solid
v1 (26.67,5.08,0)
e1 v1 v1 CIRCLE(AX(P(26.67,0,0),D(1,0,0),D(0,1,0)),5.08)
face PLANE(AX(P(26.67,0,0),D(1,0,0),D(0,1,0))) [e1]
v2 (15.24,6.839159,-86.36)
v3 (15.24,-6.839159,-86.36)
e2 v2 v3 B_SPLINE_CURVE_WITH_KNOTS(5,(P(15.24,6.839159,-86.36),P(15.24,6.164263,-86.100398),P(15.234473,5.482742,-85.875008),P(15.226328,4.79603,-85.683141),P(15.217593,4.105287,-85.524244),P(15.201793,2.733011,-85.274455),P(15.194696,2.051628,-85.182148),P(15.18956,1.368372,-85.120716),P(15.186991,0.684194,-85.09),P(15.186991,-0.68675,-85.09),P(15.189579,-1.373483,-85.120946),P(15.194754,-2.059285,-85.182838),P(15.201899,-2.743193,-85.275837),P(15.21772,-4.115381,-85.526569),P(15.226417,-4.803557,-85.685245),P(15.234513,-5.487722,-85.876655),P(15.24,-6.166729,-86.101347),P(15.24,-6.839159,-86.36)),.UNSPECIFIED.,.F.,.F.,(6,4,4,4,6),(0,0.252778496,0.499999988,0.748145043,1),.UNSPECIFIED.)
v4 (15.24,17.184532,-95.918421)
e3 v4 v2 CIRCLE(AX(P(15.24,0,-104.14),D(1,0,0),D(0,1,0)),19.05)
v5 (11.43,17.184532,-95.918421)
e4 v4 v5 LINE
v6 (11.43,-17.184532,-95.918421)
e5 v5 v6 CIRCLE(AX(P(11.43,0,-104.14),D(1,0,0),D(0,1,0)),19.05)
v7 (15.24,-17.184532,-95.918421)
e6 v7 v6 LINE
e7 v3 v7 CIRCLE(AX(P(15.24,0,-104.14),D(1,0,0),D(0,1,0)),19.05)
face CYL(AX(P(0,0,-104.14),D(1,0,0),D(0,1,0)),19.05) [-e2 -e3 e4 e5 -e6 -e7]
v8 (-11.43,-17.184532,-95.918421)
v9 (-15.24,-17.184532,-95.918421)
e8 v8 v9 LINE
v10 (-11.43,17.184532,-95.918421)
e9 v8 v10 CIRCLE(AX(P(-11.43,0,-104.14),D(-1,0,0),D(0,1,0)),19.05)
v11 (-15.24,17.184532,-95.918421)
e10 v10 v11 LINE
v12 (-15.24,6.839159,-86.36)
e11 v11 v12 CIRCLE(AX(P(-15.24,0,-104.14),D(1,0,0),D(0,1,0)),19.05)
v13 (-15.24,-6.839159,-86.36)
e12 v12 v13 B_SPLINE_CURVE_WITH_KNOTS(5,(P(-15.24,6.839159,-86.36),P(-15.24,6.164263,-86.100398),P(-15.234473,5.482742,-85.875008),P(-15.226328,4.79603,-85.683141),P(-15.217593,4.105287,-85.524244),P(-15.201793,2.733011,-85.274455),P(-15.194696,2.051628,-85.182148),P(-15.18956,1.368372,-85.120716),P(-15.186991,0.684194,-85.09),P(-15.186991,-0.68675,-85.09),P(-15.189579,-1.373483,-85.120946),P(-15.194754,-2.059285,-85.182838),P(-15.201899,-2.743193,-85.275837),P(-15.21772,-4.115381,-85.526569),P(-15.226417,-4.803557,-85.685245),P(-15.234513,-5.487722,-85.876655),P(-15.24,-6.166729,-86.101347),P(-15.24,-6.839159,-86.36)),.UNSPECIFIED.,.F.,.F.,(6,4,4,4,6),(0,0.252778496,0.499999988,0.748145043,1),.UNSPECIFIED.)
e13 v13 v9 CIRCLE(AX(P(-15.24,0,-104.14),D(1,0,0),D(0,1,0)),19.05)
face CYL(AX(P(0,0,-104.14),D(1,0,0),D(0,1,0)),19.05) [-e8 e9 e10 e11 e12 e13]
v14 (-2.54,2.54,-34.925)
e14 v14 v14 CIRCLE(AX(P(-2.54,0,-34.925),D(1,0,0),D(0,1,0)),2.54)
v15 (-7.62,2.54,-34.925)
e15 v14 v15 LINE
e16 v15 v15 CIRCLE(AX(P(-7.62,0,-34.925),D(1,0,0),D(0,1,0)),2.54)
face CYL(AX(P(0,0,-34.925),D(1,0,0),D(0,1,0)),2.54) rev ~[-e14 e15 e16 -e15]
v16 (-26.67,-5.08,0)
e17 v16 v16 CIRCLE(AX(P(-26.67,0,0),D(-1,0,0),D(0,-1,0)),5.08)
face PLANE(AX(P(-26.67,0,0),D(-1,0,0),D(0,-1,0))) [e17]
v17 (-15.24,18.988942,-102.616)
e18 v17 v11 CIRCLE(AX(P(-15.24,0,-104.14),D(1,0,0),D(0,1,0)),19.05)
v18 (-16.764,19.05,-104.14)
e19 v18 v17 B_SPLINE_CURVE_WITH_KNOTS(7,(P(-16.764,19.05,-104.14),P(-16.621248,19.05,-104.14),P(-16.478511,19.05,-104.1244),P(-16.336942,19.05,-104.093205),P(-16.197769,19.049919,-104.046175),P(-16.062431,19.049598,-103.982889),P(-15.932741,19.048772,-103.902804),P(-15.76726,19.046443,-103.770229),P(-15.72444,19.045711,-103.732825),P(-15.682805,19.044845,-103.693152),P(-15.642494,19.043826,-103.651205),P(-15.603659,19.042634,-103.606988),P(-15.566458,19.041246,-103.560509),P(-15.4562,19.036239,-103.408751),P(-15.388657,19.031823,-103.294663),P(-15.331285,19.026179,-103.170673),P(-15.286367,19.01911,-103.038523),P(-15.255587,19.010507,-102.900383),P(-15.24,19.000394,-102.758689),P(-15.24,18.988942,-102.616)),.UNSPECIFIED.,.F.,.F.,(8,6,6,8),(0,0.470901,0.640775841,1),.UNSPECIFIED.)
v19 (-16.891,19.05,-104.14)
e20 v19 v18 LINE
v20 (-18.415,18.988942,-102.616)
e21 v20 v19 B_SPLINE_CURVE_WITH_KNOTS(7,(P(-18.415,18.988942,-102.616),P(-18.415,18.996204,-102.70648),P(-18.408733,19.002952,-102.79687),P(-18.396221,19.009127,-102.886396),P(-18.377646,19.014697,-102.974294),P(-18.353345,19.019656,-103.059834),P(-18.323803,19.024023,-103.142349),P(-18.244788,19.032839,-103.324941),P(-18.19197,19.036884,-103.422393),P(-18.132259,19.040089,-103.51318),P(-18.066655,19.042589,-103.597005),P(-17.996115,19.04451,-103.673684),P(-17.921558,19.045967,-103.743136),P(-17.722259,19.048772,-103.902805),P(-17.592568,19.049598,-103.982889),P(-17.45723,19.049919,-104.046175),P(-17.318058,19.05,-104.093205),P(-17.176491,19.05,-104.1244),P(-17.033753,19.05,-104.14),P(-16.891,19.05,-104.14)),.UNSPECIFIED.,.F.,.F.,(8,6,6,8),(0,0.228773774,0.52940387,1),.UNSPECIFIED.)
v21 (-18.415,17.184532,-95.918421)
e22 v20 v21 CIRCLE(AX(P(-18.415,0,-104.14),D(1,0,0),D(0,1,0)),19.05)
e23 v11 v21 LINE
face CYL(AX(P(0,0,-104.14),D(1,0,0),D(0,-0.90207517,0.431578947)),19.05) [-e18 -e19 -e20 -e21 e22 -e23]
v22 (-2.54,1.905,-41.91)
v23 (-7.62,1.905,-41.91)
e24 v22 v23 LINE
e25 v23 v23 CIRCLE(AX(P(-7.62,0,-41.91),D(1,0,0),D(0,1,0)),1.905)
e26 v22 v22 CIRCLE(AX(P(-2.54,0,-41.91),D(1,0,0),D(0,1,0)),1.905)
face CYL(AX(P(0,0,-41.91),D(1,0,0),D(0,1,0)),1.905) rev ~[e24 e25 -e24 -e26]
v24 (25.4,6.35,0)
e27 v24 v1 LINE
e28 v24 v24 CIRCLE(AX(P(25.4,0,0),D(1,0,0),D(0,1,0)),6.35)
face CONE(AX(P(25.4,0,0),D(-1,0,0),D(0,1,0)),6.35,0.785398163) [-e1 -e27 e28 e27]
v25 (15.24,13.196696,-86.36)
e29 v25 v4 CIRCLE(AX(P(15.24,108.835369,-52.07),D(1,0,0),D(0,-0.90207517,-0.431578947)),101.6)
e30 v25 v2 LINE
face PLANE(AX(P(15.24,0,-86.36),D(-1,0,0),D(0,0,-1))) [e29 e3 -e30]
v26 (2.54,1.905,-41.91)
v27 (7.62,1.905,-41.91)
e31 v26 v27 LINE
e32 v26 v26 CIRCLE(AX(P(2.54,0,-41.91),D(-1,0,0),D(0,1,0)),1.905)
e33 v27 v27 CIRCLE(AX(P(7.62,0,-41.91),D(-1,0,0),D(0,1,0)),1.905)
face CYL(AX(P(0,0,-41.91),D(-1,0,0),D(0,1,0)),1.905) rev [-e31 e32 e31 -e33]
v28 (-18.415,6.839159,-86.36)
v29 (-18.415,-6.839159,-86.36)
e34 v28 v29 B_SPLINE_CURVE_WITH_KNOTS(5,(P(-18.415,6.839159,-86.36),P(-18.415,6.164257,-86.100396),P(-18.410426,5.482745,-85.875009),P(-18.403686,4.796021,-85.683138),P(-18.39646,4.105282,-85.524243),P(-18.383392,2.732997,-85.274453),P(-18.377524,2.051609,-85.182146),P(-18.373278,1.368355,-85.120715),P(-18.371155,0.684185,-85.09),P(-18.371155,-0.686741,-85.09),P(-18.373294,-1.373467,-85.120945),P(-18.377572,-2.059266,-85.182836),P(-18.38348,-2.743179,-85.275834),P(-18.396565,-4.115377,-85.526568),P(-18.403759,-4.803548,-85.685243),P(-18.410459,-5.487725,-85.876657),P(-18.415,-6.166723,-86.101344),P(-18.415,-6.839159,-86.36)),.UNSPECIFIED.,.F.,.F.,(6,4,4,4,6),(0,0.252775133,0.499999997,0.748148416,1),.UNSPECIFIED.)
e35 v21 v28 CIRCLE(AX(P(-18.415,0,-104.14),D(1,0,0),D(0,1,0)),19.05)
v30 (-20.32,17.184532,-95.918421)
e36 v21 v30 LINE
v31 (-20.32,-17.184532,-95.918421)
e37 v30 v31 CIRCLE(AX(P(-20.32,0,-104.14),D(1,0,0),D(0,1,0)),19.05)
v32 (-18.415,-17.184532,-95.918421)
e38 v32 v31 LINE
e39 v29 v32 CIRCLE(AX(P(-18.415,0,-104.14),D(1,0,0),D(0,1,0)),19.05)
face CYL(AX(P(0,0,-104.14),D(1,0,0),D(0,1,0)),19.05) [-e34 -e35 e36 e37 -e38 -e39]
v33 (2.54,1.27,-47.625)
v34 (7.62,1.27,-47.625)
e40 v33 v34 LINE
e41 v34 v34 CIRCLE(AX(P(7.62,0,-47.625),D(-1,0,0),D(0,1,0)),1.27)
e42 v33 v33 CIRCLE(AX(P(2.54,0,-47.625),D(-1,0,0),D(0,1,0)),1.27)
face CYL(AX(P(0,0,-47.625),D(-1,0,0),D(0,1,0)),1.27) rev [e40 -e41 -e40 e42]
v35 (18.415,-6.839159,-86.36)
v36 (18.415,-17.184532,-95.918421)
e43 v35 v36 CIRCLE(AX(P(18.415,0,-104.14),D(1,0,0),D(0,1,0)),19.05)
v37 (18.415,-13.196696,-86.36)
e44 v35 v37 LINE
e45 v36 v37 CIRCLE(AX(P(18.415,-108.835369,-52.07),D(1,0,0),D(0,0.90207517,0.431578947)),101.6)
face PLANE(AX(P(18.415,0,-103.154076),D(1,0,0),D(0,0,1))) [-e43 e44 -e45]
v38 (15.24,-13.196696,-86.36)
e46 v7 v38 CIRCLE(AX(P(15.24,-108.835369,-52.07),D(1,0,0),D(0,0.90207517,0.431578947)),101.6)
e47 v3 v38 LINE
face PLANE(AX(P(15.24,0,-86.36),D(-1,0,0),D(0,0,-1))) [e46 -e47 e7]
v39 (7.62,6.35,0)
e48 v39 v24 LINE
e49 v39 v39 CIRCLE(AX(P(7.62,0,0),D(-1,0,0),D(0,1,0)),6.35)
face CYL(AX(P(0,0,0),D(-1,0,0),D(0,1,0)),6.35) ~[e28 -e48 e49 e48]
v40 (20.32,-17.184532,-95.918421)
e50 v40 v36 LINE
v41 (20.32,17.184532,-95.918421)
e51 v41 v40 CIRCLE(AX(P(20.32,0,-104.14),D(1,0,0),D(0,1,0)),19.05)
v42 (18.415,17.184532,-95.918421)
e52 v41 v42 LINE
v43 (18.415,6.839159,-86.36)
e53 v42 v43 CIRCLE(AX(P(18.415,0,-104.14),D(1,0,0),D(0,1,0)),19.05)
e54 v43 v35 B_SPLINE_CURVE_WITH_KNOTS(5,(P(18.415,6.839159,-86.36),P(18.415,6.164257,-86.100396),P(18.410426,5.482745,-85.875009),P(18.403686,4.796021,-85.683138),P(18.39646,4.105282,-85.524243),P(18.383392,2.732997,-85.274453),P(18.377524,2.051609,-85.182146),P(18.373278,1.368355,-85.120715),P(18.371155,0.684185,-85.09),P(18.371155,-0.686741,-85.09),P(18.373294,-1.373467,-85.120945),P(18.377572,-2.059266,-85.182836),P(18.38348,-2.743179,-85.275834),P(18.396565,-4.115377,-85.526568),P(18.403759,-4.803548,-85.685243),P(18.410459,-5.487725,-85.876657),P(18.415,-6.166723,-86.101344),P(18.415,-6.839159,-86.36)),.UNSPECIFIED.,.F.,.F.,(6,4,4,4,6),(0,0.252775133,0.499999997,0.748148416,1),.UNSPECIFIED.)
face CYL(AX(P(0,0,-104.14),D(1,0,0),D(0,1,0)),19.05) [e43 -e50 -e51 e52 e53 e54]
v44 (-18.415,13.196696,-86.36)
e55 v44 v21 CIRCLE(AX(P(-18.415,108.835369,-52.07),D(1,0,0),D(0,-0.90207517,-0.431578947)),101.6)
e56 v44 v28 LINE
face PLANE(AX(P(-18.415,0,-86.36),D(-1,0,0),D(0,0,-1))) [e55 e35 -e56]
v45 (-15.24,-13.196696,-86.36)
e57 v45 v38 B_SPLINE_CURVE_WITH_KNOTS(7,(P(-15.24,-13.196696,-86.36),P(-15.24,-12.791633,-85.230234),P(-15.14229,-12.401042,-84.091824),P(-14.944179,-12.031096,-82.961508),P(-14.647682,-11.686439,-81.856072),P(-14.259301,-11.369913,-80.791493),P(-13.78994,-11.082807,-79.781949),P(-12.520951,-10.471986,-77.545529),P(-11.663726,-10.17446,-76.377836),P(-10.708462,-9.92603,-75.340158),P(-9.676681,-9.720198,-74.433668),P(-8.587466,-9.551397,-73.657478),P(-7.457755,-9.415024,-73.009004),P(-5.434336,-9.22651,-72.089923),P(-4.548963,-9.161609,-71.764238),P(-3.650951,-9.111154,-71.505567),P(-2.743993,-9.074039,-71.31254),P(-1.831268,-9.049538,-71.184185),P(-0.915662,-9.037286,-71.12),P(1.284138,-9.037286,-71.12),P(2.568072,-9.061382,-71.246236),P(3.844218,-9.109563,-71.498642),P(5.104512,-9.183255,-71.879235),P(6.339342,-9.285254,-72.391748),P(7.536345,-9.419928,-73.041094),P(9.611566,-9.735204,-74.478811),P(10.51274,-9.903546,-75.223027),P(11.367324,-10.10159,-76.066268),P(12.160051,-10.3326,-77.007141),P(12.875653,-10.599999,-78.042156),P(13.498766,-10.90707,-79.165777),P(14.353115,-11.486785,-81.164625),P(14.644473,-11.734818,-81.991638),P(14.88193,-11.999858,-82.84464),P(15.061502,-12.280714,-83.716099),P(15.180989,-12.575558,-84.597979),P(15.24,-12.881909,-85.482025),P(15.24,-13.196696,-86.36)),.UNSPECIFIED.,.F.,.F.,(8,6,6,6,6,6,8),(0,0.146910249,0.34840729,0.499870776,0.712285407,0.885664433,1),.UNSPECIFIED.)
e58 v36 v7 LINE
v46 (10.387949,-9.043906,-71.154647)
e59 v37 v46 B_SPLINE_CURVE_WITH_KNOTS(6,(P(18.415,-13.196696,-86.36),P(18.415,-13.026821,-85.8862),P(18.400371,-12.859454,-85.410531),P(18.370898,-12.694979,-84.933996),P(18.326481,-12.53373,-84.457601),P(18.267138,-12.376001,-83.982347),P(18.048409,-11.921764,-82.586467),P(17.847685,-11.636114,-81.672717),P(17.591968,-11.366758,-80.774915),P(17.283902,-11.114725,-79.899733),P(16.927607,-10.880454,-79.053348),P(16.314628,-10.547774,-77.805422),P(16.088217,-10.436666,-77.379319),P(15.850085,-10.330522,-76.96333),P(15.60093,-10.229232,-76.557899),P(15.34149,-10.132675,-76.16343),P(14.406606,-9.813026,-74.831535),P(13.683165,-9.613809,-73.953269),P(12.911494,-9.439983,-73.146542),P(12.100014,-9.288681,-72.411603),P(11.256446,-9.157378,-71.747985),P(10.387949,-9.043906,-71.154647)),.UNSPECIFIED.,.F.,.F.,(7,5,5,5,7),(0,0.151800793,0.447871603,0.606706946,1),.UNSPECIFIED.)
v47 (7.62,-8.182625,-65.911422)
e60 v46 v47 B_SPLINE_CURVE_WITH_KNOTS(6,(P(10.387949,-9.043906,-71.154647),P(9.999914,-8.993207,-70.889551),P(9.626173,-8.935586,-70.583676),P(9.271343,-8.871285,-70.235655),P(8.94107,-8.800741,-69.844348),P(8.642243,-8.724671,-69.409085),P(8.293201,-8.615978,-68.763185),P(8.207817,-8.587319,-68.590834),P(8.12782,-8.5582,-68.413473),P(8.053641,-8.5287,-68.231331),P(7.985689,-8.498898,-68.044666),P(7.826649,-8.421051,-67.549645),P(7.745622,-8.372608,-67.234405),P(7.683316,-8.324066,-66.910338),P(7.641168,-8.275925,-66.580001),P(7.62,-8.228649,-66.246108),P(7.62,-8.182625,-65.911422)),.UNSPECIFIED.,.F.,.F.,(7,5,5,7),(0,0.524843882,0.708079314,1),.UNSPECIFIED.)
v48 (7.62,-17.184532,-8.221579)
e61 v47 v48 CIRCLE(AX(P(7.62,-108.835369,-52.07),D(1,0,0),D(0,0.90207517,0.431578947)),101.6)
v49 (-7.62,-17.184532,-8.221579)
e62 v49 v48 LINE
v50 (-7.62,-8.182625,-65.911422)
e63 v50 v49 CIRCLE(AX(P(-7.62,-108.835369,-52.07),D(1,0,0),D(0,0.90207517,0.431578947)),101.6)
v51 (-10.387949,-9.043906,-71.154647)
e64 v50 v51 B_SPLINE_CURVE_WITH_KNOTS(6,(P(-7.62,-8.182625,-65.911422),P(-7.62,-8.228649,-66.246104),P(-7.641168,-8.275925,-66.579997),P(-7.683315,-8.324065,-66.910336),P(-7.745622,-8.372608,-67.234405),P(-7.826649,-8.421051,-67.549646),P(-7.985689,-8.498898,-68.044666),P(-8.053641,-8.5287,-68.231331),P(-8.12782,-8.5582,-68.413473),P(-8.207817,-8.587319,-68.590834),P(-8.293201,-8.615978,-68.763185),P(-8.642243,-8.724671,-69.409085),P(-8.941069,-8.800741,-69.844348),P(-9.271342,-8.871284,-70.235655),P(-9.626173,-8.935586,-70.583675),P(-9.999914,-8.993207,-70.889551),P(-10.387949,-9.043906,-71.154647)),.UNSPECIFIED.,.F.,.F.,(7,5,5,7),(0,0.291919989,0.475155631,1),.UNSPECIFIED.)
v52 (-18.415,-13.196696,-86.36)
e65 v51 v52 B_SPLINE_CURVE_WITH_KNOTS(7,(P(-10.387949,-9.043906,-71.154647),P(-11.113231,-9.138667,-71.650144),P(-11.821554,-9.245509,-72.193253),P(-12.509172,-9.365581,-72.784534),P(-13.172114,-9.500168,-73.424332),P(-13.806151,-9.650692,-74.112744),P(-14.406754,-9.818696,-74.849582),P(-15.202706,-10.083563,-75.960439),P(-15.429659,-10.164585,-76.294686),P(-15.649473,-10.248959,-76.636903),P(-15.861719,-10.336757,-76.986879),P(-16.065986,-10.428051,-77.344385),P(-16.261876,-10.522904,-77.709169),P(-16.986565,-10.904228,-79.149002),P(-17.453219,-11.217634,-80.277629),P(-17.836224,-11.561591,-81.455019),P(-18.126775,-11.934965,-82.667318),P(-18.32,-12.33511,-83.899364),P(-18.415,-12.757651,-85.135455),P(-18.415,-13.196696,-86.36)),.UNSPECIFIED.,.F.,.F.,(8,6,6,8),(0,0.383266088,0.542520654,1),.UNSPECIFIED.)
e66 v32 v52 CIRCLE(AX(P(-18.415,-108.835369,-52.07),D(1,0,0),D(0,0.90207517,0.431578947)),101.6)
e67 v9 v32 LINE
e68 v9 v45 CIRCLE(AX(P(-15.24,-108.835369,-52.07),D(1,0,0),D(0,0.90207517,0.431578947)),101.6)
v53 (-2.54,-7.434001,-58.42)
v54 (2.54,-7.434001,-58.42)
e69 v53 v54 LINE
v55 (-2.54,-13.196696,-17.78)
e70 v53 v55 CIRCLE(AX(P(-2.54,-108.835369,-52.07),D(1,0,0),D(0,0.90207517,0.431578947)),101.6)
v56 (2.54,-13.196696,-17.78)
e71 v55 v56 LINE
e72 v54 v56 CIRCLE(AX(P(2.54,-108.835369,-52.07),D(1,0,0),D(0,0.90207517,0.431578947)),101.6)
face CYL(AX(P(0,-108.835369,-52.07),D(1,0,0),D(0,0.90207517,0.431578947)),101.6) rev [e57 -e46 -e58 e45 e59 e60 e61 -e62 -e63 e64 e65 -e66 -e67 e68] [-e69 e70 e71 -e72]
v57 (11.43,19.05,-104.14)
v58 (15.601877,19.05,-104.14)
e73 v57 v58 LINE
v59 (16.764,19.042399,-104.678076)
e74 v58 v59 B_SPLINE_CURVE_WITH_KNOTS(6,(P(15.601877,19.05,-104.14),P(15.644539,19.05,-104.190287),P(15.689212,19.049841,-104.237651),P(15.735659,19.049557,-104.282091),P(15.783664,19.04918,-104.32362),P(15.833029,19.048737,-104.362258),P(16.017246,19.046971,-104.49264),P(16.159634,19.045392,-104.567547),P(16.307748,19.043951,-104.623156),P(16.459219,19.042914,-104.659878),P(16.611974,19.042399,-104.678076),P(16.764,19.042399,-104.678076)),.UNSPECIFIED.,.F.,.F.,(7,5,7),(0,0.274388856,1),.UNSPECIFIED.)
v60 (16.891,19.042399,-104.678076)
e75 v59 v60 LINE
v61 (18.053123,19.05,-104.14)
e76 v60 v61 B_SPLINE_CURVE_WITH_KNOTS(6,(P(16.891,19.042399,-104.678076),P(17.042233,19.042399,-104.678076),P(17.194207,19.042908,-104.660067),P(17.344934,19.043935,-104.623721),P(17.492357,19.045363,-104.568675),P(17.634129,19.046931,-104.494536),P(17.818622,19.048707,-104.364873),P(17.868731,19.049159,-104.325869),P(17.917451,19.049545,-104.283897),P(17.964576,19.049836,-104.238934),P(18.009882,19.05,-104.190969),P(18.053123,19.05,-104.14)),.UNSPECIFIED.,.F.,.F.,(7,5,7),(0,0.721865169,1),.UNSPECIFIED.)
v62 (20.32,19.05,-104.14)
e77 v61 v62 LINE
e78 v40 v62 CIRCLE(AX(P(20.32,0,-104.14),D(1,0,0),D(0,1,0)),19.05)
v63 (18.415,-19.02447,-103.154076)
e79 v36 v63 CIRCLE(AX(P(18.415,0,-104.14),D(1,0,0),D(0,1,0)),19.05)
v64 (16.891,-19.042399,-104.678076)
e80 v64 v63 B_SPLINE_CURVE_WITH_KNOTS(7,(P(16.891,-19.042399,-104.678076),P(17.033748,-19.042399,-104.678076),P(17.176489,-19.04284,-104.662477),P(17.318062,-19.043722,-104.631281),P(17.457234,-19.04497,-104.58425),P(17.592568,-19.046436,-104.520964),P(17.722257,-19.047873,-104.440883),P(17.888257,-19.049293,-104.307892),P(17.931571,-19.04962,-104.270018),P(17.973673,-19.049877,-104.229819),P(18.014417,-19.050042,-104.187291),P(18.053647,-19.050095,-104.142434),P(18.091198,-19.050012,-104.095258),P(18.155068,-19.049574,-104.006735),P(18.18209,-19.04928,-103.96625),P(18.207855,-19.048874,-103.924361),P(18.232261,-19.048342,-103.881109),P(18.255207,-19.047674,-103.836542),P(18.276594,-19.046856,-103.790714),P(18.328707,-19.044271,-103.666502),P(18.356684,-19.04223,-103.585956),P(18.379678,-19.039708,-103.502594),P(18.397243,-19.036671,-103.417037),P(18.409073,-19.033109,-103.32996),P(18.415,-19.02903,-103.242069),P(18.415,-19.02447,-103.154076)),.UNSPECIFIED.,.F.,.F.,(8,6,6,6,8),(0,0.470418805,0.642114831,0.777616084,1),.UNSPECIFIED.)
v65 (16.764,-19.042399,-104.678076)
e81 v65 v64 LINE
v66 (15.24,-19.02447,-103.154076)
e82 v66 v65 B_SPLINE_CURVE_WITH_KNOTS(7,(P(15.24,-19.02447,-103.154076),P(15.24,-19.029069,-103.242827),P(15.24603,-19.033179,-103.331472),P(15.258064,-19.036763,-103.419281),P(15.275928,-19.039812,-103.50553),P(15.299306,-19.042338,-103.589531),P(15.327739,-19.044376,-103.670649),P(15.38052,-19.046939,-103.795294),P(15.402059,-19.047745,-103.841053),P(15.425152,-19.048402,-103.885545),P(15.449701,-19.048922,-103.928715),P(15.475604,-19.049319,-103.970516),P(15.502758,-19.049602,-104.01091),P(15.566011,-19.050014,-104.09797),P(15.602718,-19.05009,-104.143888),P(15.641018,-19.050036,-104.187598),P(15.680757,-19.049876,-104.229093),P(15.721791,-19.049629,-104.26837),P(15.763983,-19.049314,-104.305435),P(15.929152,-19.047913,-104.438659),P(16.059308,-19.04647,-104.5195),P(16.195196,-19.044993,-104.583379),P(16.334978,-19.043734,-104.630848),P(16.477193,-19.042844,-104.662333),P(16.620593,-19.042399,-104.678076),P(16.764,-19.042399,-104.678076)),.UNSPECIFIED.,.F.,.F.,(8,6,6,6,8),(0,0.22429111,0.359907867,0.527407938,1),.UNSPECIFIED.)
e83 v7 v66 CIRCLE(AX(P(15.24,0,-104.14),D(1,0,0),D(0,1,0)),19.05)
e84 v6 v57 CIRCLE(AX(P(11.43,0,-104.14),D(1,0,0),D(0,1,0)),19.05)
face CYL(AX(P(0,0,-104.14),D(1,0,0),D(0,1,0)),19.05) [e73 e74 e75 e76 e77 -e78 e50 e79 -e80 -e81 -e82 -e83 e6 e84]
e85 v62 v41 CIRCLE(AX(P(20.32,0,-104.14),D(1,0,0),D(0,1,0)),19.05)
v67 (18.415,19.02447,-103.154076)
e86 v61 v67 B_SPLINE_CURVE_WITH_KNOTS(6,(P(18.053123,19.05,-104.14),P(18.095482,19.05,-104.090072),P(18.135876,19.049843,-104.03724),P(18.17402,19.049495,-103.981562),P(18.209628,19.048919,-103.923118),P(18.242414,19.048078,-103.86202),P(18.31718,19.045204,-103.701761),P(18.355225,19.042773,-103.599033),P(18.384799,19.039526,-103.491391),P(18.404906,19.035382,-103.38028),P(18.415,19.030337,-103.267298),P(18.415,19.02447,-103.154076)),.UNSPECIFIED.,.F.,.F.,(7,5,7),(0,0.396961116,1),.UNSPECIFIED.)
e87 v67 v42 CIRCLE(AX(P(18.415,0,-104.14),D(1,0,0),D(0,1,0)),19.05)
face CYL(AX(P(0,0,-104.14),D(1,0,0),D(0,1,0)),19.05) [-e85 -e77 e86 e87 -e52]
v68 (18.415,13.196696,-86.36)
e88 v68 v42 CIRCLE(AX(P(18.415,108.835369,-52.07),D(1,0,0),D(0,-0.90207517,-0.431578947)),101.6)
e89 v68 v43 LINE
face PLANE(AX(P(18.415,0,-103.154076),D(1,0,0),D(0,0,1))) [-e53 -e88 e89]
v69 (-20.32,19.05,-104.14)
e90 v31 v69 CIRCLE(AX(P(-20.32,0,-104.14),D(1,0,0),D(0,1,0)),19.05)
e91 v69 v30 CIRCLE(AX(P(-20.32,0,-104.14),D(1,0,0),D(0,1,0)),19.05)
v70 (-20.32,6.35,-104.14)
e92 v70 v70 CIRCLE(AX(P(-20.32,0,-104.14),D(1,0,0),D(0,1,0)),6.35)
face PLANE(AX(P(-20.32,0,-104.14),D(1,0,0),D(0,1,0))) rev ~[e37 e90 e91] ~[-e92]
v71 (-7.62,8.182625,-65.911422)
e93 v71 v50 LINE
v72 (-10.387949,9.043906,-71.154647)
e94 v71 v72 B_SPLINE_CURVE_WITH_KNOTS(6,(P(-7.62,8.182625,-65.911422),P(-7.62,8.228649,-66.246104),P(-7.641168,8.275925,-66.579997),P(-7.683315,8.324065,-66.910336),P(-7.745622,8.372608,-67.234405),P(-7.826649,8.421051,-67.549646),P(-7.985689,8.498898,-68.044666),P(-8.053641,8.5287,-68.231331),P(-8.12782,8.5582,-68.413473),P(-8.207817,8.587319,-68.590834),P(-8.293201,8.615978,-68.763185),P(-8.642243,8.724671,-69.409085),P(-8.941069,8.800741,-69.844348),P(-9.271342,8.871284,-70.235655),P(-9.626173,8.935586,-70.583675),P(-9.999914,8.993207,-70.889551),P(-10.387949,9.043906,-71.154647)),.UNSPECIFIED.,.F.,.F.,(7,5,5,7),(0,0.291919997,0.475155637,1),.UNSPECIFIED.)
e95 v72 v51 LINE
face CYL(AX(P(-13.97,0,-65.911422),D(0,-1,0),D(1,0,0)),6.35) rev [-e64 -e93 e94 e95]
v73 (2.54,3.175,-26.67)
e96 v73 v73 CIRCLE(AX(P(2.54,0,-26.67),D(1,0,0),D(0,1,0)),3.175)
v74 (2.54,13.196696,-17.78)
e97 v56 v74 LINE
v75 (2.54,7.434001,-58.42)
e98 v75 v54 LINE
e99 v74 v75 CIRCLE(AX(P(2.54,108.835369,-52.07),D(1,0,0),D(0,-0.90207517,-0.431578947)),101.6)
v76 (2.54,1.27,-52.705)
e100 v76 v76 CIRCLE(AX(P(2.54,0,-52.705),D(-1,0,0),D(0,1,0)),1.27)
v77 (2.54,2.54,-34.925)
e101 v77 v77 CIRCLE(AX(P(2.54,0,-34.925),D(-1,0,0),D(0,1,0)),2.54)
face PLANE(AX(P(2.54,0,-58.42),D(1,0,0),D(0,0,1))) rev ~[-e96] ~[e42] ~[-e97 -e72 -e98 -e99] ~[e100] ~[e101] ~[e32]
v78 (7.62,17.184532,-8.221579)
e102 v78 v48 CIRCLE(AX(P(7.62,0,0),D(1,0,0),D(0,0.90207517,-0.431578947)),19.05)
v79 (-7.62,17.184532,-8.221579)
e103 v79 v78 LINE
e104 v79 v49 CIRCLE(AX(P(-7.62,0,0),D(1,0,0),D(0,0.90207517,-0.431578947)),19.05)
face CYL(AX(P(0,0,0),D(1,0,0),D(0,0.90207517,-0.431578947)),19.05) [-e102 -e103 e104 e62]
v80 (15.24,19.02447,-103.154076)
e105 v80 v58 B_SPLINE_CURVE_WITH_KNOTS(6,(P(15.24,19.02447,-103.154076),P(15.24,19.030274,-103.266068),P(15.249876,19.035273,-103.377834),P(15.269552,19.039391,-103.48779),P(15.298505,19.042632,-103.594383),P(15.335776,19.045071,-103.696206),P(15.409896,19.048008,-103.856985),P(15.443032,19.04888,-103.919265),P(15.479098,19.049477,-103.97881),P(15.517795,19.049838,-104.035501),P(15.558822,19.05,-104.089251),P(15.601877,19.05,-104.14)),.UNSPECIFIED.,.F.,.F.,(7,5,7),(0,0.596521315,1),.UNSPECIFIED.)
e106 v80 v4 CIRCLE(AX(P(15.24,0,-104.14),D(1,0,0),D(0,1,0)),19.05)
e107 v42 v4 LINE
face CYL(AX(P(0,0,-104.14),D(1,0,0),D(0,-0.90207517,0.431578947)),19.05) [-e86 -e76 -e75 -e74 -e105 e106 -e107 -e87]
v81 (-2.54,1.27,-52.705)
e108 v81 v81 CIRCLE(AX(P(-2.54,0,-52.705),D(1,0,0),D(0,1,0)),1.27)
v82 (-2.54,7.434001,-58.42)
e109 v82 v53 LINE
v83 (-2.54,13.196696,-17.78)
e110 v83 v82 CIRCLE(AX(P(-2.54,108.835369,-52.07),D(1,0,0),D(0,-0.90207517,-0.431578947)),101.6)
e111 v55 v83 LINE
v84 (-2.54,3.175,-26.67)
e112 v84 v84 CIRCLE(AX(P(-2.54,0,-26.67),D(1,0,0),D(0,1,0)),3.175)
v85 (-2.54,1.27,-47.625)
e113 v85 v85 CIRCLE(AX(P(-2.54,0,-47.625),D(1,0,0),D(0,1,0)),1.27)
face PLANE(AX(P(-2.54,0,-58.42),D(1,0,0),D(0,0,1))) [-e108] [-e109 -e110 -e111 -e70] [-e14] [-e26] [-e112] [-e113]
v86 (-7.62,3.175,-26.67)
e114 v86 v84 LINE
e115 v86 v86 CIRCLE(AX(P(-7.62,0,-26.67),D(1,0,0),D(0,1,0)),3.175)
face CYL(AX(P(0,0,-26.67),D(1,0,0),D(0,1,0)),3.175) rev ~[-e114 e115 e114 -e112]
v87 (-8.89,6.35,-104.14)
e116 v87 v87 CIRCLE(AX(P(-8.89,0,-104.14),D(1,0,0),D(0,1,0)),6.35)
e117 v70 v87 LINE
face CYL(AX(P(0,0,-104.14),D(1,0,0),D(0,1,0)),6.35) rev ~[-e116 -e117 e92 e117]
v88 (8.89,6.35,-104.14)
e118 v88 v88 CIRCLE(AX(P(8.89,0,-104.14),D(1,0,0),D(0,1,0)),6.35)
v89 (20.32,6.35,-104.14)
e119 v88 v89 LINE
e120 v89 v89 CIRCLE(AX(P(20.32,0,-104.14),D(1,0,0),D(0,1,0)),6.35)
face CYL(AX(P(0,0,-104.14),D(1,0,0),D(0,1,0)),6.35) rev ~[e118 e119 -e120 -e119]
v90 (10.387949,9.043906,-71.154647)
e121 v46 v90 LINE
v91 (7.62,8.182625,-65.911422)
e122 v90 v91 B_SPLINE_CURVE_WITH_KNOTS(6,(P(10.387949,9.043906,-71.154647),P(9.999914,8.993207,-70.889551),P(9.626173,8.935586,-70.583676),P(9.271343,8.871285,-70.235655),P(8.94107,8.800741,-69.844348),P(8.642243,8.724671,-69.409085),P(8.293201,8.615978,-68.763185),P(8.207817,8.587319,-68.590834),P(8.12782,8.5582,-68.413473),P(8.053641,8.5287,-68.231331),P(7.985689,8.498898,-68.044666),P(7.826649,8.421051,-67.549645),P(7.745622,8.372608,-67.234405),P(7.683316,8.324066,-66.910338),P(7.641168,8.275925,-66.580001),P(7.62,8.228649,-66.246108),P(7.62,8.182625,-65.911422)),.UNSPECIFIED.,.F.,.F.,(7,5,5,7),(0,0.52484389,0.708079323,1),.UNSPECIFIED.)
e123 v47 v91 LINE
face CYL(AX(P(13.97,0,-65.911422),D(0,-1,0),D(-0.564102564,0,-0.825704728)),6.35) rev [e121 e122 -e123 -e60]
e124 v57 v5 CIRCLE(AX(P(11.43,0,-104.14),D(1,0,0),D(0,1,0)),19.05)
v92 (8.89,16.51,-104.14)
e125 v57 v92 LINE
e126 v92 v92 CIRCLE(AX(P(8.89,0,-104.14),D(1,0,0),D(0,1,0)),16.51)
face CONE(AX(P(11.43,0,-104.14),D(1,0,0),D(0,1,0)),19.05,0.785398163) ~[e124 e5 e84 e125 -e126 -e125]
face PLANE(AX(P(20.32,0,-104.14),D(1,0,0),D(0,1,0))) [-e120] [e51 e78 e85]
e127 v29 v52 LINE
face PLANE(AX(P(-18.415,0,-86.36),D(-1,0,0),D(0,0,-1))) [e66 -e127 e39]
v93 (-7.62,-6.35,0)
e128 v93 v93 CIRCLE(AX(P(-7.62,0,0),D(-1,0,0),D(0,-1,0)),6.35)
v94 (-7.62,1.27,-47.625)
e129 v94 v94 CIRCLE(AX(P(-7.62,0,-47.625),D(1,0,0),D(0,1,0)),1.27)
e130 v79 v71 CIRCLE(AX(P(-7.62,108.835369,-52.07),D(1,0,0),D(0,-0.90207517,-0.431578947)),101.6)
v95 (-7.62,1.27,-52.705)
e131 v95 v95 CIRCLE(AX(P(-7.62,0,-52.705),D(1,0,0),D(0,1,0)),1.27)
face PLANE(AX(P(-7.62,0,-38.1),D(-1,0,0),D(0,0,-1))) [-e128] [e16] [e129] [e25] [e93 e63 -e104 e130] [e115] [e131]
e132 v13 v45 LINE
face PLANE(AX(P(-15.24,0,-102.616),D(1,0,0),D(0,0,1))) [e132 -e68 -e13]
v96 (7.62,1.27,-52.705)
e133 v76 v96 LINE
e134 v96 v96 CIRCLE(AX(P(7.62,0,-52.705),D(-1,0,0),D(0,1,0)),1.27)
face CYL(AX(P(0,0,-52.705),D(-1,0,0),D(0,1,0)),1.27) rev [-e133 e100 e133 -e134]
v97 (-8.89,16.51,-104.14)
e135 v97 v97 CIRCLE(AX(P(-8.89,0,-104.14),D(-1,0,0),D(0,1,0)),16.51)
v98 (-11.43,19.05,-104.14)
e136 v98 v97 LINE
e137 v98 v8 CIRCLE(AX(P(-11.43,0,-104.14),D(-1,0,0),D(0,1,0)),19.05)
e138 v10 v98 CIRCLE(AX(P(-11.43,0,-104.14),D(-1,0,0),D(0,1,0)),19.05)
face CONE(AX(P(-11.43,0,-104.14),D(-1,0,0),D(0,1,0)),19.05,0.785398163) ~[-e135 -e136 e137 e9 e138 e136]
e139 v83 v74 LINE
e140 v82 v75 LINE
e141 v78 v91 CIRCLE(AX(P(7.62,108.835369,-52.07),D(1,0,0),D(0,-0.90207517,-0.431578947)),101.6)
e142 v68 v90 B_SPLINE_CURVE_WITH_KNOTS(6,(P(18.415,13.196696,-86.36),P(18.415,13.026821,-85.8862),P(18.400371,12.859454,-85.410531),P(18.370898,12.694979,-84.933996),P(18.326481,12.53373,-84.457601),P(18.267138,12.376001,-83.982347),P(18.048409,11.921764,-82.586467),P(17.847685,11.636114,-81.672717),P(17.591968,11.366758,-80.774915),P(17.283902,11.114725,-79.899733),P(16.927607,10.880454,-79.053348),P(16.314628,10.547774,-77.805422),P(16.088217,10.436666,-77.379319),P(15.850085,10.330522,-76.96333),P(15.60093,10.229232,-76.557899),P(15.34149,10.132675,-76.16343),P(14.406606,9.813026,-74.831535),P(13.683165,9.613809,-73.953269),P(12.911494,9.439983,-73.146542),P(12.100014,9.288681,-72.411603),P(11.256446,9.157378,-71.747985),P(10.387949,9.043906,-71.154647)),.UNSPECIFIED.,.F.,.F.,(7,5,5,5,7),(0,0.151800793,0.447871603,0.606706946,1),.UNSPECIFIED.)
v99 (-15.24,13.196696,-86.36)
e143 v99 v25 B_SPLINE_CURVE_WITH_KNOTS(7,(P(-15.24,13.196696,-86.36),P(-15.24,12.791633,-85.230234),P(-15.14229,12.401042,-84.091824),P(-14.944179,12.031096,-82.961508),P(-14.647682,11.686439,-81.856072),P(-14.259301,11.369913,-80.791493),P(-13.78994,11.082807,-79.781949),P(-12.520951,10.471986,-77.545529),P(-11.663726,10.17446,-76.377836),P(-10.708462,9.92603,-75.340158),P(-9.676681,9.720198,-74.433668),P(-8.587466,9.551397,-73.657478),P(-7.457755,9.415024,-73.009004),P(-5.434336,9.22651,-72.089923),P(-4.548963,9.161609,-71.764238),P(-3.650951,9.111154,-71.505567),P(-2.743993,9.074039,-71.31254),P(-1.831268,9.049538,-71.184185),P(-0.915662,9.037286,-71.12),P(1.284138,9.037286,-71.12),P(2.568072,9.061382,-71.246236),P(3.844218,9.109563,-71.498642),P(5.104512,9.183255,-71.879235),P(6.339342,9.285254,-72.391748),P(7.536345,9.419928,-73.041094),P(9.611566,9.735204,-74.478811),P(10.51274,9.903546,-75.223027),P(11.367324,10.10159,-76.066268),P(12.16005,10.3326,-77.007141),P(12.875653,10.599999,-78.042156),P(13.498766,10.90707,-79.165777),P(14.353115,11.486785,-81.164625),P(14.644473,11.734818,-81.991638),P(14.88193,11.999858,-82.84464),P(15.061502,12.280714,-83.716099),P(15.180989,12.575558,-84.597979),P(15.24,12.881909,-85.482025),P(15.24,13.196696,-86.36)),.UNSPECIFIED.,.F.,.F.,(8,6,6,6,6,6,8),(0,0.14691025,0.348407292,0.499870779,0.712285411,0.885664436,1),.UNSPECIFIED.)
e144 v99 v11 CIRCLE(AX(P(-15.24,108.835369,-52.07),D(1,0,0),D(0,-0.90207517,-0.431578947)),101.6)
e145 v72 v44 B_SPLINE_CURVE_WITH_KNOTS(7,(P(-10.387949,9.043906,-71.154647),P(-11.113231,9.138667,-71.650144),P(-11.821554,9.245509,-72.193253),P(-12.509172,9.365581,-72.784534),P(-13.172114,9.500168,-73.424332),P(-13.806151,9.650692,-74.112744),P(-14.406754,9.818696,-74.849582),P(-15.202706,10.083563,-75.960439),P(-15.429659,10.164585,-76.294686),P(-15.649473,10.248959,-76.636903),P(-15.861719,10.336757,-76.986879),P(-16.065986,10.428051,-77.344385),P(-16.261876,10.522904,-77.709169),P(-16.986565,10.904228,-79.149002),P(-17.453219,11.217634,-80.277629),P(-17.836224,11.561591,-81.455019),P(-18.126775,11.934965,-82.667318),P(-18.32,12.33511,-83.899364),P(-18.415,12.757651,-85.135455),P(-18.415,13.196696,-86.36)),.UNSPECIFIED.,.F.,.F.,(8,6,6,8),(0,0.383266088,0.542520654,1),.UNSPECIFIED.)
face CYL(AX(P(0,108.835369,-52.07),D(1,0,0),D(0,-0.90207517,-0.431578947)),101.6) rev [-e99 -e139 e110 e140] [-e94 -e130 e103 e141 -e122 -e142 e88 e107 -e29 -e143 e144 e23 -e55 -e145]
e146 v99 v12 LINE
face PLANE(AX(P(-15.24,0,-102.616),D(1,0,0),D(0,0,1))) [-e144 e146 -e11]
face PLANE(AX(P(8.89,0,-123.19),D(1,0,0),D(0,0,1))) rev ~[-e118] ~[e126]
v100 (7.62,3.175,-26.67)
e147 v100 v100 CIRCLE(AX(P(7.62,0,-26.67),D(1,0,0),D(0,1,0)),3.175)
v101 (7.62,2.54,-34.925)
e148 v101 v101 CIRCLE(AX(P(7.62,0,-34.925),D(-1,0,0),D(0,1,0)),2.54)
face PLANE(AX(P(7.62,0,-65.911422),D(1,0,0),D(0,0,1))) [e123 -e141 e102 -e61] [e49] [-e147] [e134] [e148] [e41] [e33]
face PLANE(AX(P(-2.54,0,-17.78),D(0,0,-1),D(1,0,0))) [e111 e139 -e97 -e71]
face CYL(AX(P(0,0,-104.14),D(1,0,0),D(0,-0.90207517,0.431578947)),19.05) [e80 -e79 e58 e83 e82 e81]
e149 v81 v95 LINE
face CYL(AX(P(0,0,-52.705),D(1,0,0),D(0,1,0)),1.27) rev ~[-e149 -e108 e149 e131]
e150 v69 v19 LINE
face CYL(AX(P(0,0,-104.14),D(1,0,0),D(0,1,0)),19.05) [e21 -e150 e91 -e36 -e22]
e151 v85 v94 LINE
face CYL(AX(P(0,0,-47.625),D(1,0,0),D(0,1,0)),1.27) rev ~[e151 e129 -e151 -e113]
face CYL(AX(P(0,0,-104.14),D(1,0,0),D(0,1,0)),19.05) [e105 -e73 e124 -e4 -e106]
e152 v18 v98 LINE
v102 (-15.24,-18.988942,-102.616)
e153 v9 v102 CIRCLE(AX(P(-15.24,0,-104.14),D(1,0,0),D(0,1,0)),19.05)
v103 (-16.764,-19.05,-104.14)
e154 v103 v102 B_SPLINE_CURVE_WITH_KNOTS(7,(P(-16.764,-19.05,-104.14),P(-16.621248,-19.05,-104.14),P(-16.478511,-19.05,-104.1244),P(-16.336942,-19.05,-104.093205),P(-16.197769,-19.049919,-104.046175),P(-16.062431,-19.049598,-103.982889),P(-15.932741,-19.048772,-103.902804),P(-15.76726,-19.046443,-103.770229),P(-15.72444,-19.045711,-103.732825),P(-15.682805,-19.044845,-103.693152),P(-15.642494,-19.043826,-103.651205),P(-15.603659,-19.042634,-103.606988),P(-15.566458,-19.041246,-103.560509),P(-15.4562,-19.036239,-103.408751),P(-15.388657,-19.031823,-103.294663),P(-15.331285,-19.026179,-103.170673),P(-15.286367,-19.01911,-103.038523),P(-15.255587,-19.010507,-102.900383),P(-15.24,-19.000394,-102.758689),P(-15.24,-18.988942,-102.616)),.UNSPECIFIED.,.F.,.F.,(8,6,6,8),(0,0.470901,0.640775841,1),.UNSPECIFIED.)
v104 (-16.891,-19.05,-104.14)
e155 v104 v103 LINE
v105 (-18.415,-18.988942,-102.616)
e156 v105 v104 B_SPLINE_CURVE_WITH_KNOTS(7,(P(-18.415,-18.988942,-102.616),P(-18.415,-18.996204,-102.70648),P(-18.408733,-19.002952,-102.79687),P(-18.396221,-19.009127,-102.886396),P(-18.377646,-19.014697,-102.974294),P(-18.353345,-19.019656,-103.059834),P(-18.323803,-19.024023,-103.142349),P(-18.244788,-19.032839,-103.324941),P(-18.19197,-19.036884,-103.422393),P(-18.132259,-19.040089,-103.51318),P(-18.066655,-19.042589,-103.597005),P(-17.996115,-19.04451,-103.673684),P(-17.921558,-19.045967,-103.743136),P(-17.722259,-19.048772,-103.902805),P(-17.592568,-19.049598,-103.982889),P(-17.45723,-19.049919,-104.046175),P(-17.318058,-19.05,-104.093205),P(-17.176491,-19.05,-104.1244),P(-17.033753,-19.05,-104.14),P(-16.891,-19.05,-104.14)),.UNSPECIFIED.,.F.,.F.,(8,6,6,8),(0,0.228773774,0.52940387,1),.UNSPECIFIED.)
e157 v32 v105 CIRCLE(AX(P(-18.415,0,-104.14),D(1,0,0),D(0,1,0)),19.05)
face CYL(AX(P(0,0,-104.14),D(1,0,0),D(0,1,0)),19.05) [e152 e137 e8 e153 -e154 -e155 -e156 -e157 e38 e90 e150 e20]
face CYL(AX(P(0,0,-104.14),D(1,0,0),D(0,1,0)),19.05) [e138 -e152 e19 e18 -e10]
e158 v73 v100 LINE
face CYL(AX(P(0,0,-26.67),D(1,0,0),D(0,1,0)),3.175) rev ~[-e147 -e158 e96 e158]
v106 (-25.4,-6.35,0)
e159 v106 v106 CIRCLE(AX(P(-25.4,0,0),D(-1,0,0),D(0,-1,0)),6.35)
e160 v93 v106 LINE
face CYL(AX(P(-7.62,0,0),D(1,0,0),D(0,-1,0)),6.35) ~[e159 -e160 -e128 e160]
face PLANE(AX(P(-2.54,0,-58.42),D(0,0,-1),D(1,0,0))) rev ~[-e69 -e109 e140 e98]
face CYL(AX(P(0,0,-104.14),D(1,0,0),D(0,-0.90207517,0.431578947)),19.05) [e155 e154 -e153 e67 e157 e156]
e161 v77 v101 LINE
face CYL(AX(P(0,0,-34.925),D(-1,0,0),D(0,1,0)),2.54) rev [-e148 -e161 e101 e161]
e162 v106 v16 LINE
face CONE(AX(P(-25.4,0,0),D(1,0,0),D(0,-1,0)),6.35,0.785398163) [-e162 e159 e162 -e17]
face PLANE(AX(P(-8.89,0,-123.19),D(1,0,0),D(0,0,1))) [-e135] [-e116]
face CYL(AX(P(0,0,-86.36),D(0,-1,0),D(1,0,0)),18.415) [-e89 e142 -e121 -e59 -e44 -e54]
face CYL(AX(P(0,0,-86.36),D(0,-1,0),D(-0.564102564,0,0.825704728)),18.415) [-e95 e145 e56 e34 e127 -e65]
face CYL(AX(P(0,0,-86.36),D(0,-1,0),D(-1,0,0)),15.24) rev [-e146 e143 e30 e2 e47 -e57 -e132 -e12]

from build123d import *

# Parameters (mm, degrees)
F1_DEPTH  = 22.225
F3_R      = 19.05
F4_DEPTH  = 20.32
F2_R      = 6.35
F6_DEPTH  = 38.1
F5_W      = 17.78
F5_H      = 38.1
F7_DEPTH  = 19.05
F8_SIZE   = 2.54
F10_DEPTH = 7.62
F11_R     = 6.35
F12_DEPTH = 26.67
F13_SIZE  = 1.27
F15_DEPTH = 38.1
F16_W     = 5.08
F16_H     = 40.64
F17_DEPTH = 25.4
F18_R     = 6.35
F19_DEPTH = 19.05
F20_R     = 1.905
F20_R_2   = 1.27
F20_R_3   = 2.54
F20_R_4   = 3.175
F21_DEPTH = 12.7
F22_SIZE  = 1.27


with BuildPart() as f1:
    # F0 (on Front) → F1 (new body, symmetric)
    with BuildSketch(Plane.XZ):
        with BuildLine():
            Line((7.62, 0), (-7.62, 0))
            Line((-7.62, 0), (-7.62, -24.5142909701))
            Line((-7.62, -24.5142909701), (-7.62, -27.8114224211))
            ThreePointArc((-7.62, -27.8114224211), (-8.3544623748, -30.77591853), (-10.3879487179, -33.0546474413))
            ThreePointArc((-10.3879487179, -33.0546474413), (-16.2850591132, -39.6629612843), (-18.415, -48.26))
            Line((-18.415, -48.26), (-18.415, -64.516))
            ThreePointArc((-18.415, -64.516), (-17.9686307345, -65.5936307345), (-16.891, -66.04))
            Line((-16.891, -66.04), (-16.764, -66.04))
            ThreePointArc((-16.764, -66.04), (-15.6863692655, -65.5936307345), (-15.24, -64.516))
            Line((-15.24, -64.516), (-15.24, -48.26))
            ThreePointArc((-15.24, -48.26), (0, -33.02), (15.24, -48.26))
            Line((15.24, -48.26), (15.24, -65.0540764831))
            ThreePointArc((15.24, -65.0540764831), (15.6863692655, -66.1317072176), (16.764, -66.5780764831))
            Line((16.764, -66.5780764831), (16.891, -66.5780764831))
            ThreePointArc((16.891, -66.5780764831), (17.9686307345, -66.1317072176), (18.415, -65.0540764831))
            Line((18.415, -65.0540764831), (18.415, -48.26))
            ThreePointArc((18.415, -48.26), (16.2850591132, -39.6629612843), (10.3879487179, -33.0546474413))
            ThreePointArc((10.3879487179, -33.0546474413), (8.3544623748, -30.77591853), (7.62, -27.8114224211))
            Line((7.62, -27.8114224211), (7.62, -24.5142909701))
            Line((7.62, -24.5142909701), (7.62, 0))
        make_face()
    extrude(amount=F1_DEPTH, both=True)

    # F3 (on Right) → F4 (join, symmetric)
    with BuildSketch(Plane.YZ):
        with Locations((0, -66.04)):
            Circle(F3_R)
    extrude(amount=F4_DEPTH, both=True)

    # F2 (on Right) → F6 (cut, symmetric)
    with BuildSketch(Plane.YZ):
        with Locations((0, -66.04)):
            Circle(F2_R)
    extrude(amount=F6_DEPTH, both=True, mode=Mode.SUBTRACT)

    # F5 (on Front) → F7 (cut, symmetric)
    with BuildSketch(Plane.XZ):
        with Locations((0, -66.04)):
            Rectangle(F5_W, F5_H)
    extrude(amount=F7_DEPTH, both=True, mode=Mode.SUBTRACT)

    # F8
    f8_edges = [f1.edges().sort_by_distance(p)[0] for p in [
        (-8.89, -19.05, -66.04),
        (8.89, -19.05, -66.04),
    ]]
    chamfer(f8_edges, length=F8_SIZE)

    # F9 (on Right) → F10 (join, symmetric)
    with BuildSketch(Plane.YZ):
        with BuildLine():
            Line((19.0499954742, -0.0131314098), (19.0499954742, 38.0868685902))
            ThreePointArc((19.0499954742, 38.0868685902), (0, 57.15), (-19.0499954742, 38.0868685902))
            Line((-19.0499954742, 38.0868685902), (-19.0499954742, -0.0131314098))
            Line((-19.0499954742, -0.0131314098), (19.0499954742, -0.0131314098))
        make_face()
    extrude(amount=F10_DEPTH, both=True)

    # F11 (on Right) → F12 (join)
    with BuildSketch(Plane.YZ):
        with Locations((0, 38.1)):
            Circle(F11_R)
    extrude(amount=F12_DEPTH)

    # F13
    f13_edges = [f1.edges().sort_by_distance(p)[0] for p in [
        (26.67, -6.35, 38.1),
    ]]
    chamfer(f13_edges, length=F13_SIZE)

    # F14 (on Right) → F15 (intersect, symmetric)
    with BuildSketch(Plane.YZ):
        with BuildLine():
            ThreePointArc((17.184531987, -57.8184210526), (7.235369251, -13.97), (17.184531987, 29.8784210526))
            ThreePointArc((17.184531987, 29.8784210526), (0, 57.15), (-17.184531987, 29.8784210526))
            ThreePointArc((-17.184531987, 29.8784210526), (-7.235369251, -13.97), (-17.184531987, -57.8184210526))
            ThreePointArc((-17.184531987, -57.8184210526), (0, -85.09), (17.184531987, -57.8184210526))
        make_face()
    extrude(amount=F15_DEPTH, both=True, mode=Mode.INTERSECT)

    # F16 (on Front) → F17 (cut, symmetric)
    with BuildSketch(Plane.XZ):
        Rectangle(F16_W, F16_H)
    extrude(amount=F17_DEPTH, both=True, mode=Mode.SUBTRACT)

    # F18 (on face) → F19 (join)
    with BuildSketch(Plane(origin=(-7.62, 0, 0), x_dir=(0, -1, 0), z_dir=(-1, 0, 0))):
        with Locations((0, 38.1)):
            Circle(F18_R)
    extrude(amount=F19_DEPTH)

    # F20 (on Right) → F21 (cut, symmetric)
    with BuildSketch(Plane.YZ):
        with Locations((0, -3.81)):
            Circle(F20_R)
        with Locations((0, -9.525)):
            Circle(F20_R_2)
        with Locations((0, -14.605)):
            Circle(F20_R_2)
        with Locations((0, 3.175)):
            Circle(F20_R_3)
        with Locations((0, 11.43)):
            Circle(F20_R_4)
    extrude(amount=F21_DEPTH, both=True, mode=Mode.SUBTRACT)

    # F22
    f22_edges = [f1.edges().sort_by_distance(p)[0] for p in [
        (-26.67, 6.35, 38.1),
    ]]
    chamfer(f22_edges, length=F22_SIZE)


with BuildPart() as f1_1:
    # F24: moved
    add(f1.part.moved(Location((0, 0, -38.1))))


solid = f1_1.part
